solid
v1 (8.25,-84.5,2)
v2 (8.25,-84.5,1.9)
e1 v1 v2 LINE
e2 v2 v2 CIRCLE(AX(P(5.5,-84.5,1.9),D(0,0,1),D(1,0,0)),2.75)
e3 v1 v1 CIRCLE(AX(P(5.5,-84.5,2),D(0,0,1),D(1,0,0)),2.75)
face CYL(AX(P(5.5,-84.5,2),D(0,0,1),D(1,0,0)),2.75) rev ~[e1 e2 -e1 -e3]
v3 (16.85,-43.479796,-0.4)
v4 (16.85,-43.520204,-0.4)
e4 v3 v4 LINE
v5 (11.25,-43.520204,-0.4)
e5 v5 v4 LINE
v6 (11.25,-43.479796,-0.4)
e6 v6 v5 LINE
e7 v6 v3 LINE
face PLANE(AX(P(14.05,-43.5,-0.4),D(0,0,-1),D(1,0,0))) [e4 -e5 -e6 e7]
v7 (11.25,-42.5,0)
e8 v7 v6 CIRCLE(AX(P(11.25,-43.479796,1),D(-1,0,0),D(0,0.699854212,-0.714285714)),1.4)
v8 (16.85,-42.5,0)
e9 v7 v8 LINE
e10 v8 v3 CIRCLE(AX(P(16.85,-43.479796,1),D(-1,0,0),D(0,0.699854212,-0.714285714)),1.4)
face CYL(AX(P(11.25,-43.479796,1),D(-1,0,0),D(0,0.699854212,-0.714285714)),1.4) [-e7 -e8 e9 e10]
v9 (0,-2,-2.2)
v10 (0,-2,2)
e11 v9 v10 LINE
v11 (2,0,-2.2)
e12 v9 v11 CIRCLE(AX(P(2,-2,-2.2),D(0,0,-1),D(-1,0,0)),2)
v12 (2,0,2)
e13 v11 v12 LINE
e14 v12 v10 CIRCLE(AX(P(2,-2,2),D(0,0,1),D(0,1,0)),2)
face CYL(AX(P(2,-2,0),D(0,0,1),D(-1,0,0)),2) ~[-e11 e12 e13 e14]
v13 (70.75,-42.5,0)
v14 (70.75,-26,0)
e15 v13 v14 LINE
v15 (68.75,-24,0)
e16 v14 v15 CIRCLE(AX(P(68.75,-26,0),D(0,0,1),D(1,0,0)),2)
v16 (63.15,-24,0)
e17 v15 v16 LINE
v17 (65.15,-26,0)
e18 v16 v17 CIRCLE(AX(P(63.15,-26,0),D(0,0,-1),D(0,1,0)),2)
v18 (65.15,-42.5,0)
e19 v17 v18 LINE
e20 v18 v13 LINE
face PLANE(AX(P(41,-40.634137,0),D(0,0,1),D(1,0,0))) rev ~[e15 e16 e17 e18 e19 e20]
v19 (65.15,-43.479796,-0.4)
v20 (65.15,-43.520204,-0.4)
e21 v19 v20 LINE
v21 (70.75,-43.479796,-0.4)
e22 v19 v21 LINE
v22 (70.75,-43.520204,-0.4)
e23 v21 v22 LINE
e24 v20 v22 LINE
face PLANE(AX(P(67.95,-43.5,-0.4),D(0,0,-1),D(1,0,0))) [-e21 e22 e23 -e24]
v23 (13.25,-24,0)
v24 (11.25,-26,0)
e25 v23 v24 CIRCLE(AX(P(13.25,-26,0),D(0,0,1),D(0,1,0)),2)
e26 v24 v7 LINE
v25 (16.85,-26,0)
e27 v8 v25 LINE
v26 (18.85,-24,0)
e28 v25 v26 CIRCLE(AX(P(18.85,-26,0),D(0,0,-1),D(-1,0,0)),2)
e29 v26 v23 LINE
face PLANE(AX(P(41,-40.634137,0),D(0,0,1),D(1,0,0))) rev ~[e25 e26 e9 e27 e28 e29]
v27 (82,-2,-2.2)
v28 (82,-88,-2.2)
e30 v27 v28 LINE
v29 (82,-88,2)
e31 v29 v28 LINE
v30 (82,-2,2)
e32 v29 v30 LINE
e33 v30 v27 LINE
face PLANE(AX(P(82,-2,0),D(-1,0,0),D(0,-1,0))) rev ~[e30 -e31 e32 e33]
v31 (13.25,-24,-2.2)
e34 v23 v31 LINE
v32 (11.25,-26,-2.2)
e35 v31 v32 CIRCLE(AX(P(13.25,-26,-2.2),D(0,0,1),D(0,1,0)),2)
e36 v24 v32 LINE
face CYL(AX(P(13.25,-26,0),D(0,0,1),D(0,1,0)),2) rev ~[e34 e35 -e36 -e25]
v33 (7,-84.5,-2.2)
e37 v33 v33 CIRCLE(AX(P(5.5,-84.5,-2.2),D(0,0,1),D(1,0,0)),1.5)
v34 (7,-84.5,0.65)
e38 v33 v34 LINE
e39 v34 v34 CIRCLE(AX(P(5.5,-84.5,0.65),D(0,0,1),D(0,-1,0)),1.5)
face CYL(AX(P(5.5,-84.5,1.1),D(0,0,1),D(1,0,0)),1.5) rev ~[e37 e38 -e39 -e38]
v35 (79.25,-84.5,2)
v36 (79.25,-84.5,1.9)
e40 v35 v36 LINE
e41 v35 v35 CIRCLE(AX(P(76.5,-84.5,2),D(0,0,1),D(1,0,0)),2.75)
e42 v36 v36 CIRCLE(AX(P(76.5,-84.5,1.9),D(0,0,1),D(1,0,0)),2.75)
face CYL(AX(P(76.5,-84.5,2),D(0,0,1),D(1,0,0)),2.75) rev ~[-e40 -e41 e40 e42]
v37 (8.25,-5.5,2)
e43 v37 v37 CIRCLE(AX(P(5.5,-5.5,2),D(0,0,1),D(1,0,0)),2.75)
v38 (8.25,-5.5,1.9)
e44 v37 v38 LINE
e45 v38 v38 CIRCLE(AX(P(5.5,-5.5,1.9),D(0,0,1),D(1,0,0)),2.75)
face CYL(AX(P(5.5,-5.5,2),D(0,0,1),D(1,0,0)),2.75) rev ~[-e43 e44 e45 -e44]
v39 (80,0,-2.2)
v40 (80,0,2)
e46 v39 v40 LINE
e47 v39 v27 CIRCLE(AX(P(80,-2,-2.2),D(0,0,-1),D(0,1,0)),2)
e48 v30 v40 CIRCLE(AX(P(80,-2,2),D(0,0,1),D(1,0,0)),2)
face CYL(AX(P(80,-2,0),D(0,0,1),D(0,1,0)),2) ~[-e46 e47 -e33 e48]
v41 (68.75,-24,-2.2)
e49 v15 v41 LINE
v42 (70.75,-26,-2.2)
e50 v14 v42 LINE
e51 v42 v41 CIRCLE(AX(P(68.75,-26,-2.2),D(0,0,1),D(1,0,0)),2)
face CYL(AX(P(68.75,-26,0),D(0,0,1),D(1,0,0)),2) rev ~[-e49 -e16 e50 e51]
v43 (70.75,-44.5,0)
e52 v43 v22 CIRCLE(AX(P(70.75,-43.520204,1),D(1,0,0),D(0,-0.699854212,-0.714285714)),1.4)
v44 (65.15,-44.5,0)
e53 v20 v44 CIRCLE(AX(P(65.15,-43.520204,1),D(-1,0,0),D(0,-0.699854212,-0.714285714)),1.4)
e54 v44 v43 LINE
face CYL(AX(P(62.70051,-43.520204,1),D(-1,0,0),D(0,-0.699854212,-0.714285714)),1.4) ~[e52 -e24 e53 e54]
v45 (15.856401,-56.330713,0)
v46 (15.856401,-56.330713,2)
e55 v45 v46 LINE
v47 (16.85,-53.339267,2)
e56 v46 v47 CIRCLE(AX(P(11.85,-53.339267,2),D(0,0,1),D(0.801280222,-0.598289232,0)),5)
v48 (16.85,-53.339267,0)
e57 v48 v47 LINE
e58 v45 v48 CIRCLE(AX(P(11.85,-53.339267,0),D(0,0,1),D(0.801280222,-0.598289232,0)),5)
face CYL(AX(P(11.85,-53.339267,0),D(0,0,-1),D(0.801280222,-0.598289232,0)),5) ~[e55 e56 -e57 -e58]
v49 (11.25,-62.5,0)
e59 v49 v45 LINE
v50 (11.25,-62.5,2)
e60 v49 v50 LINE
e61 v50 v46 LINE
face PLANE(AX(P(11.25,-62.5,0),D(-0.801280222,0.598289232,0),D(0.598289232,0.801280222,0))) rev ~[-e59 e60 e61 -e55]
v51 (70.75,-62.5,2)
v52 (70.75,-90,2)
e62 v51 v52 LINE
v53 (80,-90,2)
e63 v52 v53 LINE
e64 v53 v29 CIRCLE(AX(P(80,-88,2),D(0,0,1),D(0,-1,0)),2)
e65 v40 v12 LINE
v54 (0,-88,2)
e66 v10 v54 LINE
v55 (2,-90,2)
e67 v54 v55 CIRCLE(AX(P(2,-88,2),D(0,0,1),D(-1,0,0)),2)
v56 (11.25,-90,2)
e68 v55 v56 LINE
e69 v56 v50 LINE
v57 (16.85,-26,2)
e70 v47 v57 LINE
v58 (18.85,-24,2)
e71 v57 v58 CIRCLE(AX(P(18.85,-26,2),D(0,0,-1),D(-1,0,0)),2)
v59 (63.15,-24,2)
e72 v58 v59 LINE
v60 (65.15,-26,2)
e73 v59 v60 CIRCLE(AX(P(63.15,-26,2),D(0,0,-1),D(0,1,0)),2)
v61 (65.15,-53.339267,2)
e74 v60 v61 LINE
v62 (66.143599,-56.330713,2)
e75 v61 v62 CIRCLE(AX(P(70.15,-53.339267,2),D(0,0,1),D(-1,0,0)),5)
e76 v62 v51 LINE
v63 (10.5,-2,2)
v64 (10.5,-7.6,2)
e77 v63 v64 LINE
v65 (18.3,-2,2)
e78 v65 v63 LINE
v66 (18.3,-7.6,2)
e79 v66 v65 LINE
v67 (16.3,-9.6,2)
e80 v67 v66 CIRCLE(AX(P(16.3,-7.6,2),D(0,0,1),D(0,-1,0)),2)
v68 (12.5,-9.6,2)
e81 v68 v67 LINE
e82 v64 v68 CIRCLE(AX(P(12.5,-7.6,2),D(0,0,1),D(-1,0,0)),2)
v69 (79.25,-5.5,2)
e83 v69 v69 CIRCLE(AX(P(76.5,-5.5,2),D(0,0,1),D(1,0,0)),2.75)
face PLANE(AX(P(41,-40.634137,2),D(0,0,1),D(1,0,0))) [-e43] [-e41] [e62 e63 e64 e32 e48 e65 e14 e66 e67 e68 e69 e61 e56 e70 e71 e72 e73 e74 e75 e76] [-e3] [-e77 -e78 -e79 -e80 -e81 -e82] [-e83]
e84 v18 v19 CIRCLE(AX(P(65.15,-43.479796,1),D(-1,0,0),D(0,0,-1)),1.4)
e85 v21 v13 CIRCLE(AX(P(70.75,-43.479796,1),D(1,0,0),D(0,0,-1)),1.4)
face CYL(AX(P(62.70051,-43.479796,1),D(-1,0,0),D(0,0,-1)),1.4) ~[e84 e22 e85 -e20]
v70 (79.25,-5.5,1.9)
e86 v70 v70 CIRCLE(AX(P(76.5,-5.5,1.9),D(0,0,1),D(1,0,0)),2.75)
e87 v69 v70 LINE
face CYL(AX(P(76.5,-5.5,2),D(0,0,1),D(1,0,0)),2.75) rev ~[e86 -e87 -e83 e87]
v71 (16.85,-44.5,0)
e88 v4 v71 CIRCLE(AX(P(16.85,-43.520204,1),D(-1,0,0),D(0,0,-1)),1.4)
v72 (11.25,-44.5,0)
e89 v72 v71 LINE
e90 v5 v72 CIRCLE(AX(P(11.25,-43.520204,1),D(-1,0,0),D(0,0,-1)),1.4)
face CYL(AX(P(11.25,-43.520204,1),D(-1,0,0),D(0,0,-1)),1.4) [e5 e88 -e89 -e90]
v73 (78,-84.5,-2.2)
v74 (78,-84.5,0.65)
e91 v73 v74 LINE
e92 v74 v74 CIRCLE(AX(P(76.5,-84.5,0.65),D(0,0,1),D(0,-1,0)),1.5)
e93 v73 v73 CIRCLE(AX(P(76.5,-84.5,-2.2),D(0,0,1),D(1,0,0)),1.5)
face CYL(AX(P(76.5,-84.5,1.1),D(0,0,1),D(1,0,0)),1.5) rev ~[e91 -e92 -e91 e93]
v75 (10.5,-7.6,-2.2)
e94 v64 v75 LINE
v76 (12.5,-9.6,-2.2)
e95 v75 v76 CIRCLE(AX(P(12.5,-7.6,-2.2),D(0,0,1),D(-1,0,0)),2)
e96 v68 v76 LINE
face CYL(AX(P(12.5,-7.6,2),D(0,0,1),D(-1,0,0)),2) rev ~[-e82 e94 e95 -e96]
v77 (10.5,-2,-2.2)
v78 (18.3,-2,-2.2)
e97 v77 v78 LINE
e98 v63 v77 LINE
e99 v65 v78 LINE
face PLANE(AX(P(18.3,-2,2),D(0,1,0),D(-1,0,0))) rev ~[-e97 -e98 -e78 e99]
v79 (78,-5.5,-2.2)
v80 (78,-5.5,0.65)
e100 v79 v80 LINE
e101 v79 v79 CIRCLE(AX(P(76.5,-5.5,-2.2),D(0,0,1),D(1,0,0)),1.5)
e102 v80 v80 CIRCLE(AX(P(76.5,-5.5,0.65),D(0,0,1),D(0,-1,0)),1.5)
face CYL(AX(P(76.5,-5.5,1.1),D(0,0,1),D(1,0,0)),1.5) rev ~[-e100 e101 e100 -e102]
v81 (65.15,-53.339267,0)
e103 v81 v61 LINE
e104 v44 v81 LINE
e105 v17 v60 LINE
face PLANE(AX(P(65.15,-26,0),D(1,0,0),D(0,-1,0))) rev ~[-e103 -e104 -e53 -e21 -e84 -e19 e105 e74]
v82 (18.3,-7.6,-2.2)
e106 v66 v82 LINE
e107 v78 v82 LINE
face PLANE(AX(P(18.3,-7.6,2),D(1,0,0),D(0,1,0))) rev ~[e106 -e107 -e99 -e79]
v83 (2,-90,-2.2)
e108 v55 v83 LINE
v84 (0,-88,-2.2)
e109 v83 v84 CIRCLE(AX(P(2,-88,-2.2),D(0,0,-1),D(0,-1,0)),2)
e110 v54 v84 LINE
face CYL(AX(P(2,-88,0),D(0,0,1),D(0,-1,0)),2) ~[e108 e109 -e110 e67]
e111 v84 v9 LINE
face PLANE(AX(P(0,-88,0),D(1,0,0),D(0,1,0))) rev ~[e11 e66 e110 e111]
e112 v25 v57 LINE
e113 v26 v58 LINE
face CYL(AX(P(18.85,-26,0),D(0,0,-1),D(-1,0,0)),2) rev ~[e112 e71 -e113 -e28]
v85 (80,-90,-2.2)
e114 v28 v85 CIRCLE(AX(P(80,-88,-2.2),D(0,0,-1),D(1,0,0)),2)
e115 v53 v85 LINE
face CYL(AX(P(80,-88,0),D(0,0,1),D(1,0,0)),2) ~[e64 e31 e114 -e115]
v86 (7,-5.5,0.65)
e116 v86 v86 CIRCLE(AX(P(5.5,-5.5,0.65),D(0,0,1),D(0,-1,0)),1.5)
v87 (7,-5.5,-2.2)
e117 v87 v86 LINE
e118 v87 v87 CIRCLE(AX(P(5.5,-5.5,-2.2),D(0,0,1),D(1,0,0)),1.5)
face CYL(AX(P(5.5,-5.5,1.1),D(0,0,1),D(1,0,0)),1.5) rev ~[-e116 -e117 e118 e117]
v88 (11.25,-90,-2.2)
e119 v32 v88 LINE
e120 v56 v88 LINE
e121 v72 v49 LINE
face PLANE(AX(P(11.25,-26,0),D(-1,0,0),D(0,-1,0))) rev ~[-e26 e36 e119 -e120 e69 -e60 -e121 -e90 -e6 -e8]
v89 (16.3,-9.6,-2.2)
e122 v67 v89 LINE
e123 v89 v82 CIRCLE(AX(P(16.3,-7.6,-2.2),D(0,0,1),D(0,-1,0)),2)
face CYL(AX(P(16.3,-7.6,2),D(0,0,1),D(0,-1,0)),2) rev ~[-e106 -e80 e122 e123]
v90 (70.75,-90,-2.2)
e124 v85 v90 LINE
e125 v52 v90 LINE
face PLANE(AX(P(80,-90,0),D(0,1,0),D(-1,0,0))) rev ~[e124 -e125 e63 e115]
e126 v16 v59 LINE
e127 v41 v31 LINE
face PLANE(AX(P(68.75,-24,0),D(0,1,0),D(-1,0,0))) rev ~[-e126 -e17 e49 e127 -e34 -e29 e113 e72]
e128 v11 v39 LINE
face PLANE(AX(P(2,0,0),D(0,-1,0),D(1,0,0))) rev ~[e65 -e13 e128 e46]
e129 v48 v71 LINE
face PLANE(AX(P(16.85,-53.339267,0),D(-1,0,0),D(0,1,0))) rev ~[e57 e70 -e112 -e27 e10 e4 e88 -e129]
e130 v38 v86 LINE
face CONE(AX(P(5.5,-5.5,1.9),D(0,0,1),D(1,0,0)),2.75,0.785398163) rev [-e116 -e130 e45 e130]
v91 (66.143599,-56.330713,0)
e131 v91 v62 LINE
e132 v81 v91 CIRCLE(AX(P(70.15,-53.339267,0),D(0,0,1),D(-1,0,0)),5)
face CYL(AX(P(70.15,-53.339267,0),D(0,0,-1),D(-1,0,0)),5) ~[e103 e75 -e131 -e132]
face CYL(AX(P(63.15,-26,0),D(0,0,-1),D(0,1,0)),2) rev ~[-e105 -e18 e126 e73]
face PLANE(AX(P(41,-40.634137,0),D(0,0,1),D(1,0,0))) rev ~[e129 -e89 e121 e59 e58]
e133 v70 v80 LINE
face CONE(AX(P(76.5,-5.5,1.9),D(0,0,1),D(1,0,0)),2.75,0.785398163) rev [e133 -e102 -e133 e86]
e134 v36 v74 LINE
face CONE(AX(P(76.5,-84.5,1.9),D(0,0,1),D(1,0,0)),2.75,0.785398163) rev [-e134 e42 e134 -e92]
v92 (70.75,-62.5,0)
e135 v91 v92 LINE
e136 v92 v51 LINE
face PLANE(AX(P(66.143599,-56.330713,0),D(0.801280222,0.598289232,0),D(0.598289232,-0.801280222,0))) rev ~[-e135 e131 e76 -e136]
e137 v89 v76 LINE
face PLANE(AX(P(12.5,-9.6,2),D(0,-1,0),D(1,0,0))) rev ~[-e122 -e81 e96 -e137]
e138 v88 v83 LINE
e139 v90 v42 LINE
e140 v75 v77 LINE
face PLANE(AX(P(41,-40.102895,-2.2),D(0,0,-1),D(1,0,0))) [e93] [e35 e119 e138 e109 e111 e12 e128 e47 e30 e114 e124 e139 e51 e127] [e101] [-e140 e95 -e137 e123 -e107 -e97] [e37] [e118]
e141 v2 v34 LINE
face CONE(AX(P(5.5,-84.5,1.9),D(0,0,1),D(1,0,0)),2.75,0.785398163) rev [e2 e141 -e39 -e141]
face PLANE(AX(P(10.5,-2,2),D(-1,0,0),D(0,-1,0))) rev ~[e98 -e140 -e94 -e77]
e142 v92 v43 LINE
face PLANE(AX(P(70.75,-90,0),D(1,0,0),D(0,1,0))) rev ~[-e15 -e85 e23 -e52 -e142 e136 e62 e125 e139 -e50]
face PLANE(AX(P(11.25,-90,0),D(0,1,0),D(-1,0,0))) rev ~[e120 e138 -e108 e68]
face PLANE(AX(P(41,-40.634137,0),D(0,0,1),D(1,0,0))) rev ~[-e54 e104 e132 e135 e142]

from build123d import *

# Parameters (mm, degrees)
F1_DEPTH      = 2
F3_DEPTH      = 2.2
F5_DEPTH      = 25
F6_R          = 1.5
F7_DEPTH      = 4.2
F8_R          = 2.75
F9_DEPTH      = 1.6
F10_S5_R      = 1.5
F10_T6_DEPTH  = 5
F10_S11_R     = 1.5
F10_T12_DEPTH = 5
F10_S17_R     = 1.5
F10_T18_DEPTH = 5
F10_S23_R     = 1.5
F10_T24_DEPTH = 5
F11_W         = 5.6
F11_H         = 2
F12_DEPTH     = 0.4
F13_T1_DEPTH  = 8.0494897428
F13_T3_DEPTH  = 8.0494897428


# Not quite as in the source:
# - a fillet or chamfer that OpenCascade refuses, or shapes differently, is made with other operations: its cross-section is extruded or revolved along the edge and cut away or added


with BuildPart() as f1:
    # F0 (on Top) → F1 (new body)
    with BuildSketch(Plane.XY):
        with BuildLine():
            Line((80, 0), (2, 0))
            ThreePointArc((2, 0), (0.5857864376, -0.5857864376), (0, -2))
            Line((0, -2), (0, -88))
            ThreePointArc((0, -88), (0.5857864376, -89.4142135624), (2, -90))
            Line((2, -90), (11.25, -90))
            Line((11.25, -90), (11.25, -62.5))
            Line((11.25, -62.5), (15.8564011104, -56.3307127986))
            ThreePointArc((15.8564011104, -56.3307127986), (16.5951030311, -54.9153368199), (16.85, -53.3392666362))
            Line((16.85, -53.3392666362), (16.85, -26))
            ThreePointArc((16.85, -26), (17.4357864376, -24.5857864376), (18.85, -24))
            Line((18.85, -24), (63.15, -24))
            ThreePointArc((63.15, -24), (64.5642135624, -24.5857864376), (65.15, -26))
            Line((65.15, -26), (65.15, -53.3392666362))
            ThreePointArc((65.15, -53.3392666362), (65.4048969689, -54.9153368199), (66.1435988896, -56.3307127986))
            Line((66.1435988896, -56.3307127986), (70.75, -62.5))
            Line((70.75, -62.5), (70.75, -90))
            Line((70.75, -90), (80, -90))
            ThreePointArc((80, -90), (81.4142135624, -89.4142135624), (82, -88))
            Line((82, -88), (82, -2))
            ThreePointArc((82, -2), (81.4142135624, -0.5857864376), (80, 0))
        make_face()
    extrude(amount=F1_DEPTH)

    # F2 (on face) → F3 (join)
    with BuildSketch(Plane(origin=(0, 0, 0), x_dir=(1, 0, 0), z_dir=(0, 0, -1))):
        with BuildLine():
            ThreePointArc((80, 0), (81.4142135624, 0.5857864376), (82, 2))
            Line((82, 2), (82, 88))
            ThreePointArc((82, 88), (81.4142135624, 89.4142135624), (80, 90))
            Line((80, 90), (70.75, 90))
            Line((70.75, 90), (70.75, 62.5))
            Line((70.75, 62.5), (70.75, 26))
            ThreePointArc((70.75, 26), (70.1642135624, 24.5857864376), (68.75, 24))
            Line((68.75, 24), (65.15, 24))
            Line((65.15, 24), (16.85, 24))
            Line((16.85, 24), (13.25, 24))
            ThreePointArc((13.25, 24), (11.8357864376, 24.5857864376), (11.25, 26))
            Line((11.25, 26), (11.25, 62.5))
            Line((11.25, 62.5), (11.25, 90))
            Line((11.25, 90), (2, 90))
            ThreePointArc((2, 90), (0.5857864376, 89.4142135624), (0, 88))
            Line((0, 88), (0, 2))
            ThreePointArc((0, 2), (0.5857864376, 0.5857864376), (2, 0))
            Line((2, 0), (80, 0))
        make_face()
    extrude(amount=F3_DEPTH)

    # F4 (on face) → F5 (cut)
    with BuildSketch(Plane.XY.offset(2)):
        with BuildLine():
            Line((18.3, -2), (10.5, -2))
            Line((10.5, -2), (10.5, -7.6))
            ThreePointArc((10.5, -7.6), (11.0857864376, -9.0142135624), (12.5, -9.6))
            Line((12.5, -9.6), (16.3, -9.6))
            ThreePointArc((16.3, -9.6), (17.7142135624, -9.0142135624), (18.3, -7.6))
            Line((18.3, -7.6), (18.3, -2))
        make_face()
    extrude(amount=-F5_DEPTH, mode=Mode.SUBTRACT)

    # F6 (on face) → F7 (cut)
    with BuildSketch(Plane.XY.offset(2)):
        with Locations((5.5, -84.5)):
            Circle(F6_R)
        with Locations((76.5, -84.5)):
            Circle(F6_R)
        with Locations((5.5, -5.5)):
            Circle(F6_R)
        with Locations((76.5, -5.5)):
            Circle(F6_R)
    extrude(amount=-F7_DEPTH, mode=Mode.SUBTRACT)

    # F8 (on face) → F9 (cut)
    with BuildSketch(Plane.XY.offset(2)):
        with Locations((5.5, -5.5)):
            Circle(F8_R)
        with Locations((76.5, -5.5)):
            Circle(F8_R)
        with Locations((76.5, -84.5)):
            Circle(F8_R)
        with Locations((5.5, -84.5)):
            Circle(F8_R)
    extrude(amount=-F9_DEPTH, mode=Mode.SUBTRACT)

    # F10: chamfer of 1.5 on 4 edges, made by hand


with BuildPart() as f10_tool2:
    # F10_s3 → F10_t4 (revolve)
    with BuildSketch(Plane.XZ.offset(84.5)):
        Polygon((8.25, 1.9), (6.75, 0.4), (8.25, 0.4), align=None)
    revolve(axis=Axis((5.5, -84.5, 0.4), (0, 0, 1)))

    # F10_s5 → F10_t6 (cut, symmetric)
    with BuildSketch(Plane.XY.offset(1.1)):
        with Locations((5.5, -84.5)):
            Circle(F10_S5_R)
    extrude(amount=F10_T6_DEPTH, both=True, mode=Mode.SUBTRACT)


with BuildPart() as f1_1:
    add(f1.part)

    # F10_t1: union F10_tool2
    add(f10_tool2.part)


with BuildPart() as f10_tool8:
    # F10_s9 → F10_t10 (revolve)
    with BuildSketch(Plane.XZ.offset(84.5)):
        Polygon((79.25, 1.9), (77.75, 0.4), (79.25, 0.4), align=None)
    revolve(axis=Axis((76.5, -84.5, 0.4), (0, 0, 1)))

    # F10_s11 → F10_t12 (cut, symmetric)
    with BuildSketch(Plane.XY.offset(1.1)):
        with Locations((76.5, -84.5)):
            Circle(F10_S11_R)
    extrude(amount=F10_T12_DEPTH, both=True, mode=Mode.SUBTRACT)


with BuildPart() as f1_2:
    add(f1_1.part)

    # F10_t7: union F10_tool8
    add(f10_tool8.part)


with BuildPart() as f10_tool14:
    # F10_s15 → F10_t16 (revolve)
    with BuildSketch(Plane.XZ.offset(5.5)):
        Polygon((8.25, 1.9), (6.75, 0.4), (8.25, 0.4), align=None)
    revolve(axis=Axis((5.5, -5.5, 0.4), (0, 0, 1)))

    # F10_s17 → F10_t18 (cut, symmetric)
    with BuildSketch(Plane.XY.offset(1.1)):
        with Locations((5.5, -5.5)):
            Circle(F10_S17_R)
    extrude(amount=F10_T18_DEPTH, both=True, mode=Mode.SUBTRACT)


with BuildPart() as f1_3:
    add(f1_2.part)

    # F10_t13: union F10_tool14
    add(f10_tool14.part)


with BuildPart() as f10_tool20:
    # F10_s21 → F10_t22 (revolve)
    with BuildSketch(Plane.XZ.offset(5.5)):
        Polygon((79.25, 1.9), (77.75, 0.4), (79.25, 0.4), align=None)
    revolve(axis=Axis((76.5, -5.5, 0.4), (0, 0, 1)))

    # F10_s23 → F10_t24 (cut, symmetric)
    with BuildSketch(Plane.XY.offset(1.1)):
        with Locations((76.5, -5.5)):
            Circle(F10_S23_R)
    extrude(amount=F10_T24_DEPTH, both=True, mode=Mode.SUBTRACT)


with BuildPart() as f1_4:
    add(f1_3.part)

    # F10_t19: union F10_tool20
    add(f10_tool20.part)

    # F11 (on face) → F12 (join)
    with BuildSketch(Plane(origin=(0, 0, 0), x_dir=(1, 0, 0), z_dir=(0, 0, -1))):
        with Locations((14.05, 43.5)):
            Rectangle(F11_W, F11_H)
        with Locations((67.95, 43.5)):
            Rectangle(F11_W, F11_H)
    extrude(amount=F12_DEPTH)

    # F13: fillet of radius 1.4 on 4 edges, made by hand

    # F13_s2 → F13_t1 (cut)
    with BuildSketch(Plane.YZ.offset(11.25)):
        with BuildLine():
            ThreePointArc((-42.5, 0), (-42.9506456349, -0.2961481397), (-43.4797958971, -0.4))
            Line((-43.4797958971, -0.4), (-42.5, -0.4))
            Line((-42.5, -0.4), (-42.5, 0))
        make_face()
        with BuildLine():
            ThreePointArc((-43.5202041029, -0.4), (-44.0493543651, -0.2961481397), (-44.5, 0))
            Line((-44.5, 0), (-44.5, -0.4))
            Line((-44.5, -0.4), (-43.5202041029, -0.4))
        make_face()
    extrude(amount=F13_T1_DEPTH, mode=Mode.SUBTRACT)

    # F13_s4 → F13_t3 (cut)
    with BuildSketch(Plane.YZ.offset(62.7005102572)):
        with BuildLine():
            ThreePointArc((-43.4797958971, -0.4), (-42.9506456349, -0.2961481397), (-42.5, 0))
            Line((-42.5, 0), (-42.5, -0.4))
            Line((-42.5, -0.4), (-43.4797958971, -0.4))
        make_face()
        with BuildLine():
            ThreePointArc((-44.5, 0), (-44.0493543651, -0.2961481397), (-43.5202041029, -0.4))
            Line((-43.5202041029, -0.4), (-44.5, -0.4))
            Line((-44.5, -0.4), (-44.5, 0))
        make_face()
    extrude(amount=F13_T3_DEPTH, mode=Mode.SUBTRACT)


solid = f1_4.part
